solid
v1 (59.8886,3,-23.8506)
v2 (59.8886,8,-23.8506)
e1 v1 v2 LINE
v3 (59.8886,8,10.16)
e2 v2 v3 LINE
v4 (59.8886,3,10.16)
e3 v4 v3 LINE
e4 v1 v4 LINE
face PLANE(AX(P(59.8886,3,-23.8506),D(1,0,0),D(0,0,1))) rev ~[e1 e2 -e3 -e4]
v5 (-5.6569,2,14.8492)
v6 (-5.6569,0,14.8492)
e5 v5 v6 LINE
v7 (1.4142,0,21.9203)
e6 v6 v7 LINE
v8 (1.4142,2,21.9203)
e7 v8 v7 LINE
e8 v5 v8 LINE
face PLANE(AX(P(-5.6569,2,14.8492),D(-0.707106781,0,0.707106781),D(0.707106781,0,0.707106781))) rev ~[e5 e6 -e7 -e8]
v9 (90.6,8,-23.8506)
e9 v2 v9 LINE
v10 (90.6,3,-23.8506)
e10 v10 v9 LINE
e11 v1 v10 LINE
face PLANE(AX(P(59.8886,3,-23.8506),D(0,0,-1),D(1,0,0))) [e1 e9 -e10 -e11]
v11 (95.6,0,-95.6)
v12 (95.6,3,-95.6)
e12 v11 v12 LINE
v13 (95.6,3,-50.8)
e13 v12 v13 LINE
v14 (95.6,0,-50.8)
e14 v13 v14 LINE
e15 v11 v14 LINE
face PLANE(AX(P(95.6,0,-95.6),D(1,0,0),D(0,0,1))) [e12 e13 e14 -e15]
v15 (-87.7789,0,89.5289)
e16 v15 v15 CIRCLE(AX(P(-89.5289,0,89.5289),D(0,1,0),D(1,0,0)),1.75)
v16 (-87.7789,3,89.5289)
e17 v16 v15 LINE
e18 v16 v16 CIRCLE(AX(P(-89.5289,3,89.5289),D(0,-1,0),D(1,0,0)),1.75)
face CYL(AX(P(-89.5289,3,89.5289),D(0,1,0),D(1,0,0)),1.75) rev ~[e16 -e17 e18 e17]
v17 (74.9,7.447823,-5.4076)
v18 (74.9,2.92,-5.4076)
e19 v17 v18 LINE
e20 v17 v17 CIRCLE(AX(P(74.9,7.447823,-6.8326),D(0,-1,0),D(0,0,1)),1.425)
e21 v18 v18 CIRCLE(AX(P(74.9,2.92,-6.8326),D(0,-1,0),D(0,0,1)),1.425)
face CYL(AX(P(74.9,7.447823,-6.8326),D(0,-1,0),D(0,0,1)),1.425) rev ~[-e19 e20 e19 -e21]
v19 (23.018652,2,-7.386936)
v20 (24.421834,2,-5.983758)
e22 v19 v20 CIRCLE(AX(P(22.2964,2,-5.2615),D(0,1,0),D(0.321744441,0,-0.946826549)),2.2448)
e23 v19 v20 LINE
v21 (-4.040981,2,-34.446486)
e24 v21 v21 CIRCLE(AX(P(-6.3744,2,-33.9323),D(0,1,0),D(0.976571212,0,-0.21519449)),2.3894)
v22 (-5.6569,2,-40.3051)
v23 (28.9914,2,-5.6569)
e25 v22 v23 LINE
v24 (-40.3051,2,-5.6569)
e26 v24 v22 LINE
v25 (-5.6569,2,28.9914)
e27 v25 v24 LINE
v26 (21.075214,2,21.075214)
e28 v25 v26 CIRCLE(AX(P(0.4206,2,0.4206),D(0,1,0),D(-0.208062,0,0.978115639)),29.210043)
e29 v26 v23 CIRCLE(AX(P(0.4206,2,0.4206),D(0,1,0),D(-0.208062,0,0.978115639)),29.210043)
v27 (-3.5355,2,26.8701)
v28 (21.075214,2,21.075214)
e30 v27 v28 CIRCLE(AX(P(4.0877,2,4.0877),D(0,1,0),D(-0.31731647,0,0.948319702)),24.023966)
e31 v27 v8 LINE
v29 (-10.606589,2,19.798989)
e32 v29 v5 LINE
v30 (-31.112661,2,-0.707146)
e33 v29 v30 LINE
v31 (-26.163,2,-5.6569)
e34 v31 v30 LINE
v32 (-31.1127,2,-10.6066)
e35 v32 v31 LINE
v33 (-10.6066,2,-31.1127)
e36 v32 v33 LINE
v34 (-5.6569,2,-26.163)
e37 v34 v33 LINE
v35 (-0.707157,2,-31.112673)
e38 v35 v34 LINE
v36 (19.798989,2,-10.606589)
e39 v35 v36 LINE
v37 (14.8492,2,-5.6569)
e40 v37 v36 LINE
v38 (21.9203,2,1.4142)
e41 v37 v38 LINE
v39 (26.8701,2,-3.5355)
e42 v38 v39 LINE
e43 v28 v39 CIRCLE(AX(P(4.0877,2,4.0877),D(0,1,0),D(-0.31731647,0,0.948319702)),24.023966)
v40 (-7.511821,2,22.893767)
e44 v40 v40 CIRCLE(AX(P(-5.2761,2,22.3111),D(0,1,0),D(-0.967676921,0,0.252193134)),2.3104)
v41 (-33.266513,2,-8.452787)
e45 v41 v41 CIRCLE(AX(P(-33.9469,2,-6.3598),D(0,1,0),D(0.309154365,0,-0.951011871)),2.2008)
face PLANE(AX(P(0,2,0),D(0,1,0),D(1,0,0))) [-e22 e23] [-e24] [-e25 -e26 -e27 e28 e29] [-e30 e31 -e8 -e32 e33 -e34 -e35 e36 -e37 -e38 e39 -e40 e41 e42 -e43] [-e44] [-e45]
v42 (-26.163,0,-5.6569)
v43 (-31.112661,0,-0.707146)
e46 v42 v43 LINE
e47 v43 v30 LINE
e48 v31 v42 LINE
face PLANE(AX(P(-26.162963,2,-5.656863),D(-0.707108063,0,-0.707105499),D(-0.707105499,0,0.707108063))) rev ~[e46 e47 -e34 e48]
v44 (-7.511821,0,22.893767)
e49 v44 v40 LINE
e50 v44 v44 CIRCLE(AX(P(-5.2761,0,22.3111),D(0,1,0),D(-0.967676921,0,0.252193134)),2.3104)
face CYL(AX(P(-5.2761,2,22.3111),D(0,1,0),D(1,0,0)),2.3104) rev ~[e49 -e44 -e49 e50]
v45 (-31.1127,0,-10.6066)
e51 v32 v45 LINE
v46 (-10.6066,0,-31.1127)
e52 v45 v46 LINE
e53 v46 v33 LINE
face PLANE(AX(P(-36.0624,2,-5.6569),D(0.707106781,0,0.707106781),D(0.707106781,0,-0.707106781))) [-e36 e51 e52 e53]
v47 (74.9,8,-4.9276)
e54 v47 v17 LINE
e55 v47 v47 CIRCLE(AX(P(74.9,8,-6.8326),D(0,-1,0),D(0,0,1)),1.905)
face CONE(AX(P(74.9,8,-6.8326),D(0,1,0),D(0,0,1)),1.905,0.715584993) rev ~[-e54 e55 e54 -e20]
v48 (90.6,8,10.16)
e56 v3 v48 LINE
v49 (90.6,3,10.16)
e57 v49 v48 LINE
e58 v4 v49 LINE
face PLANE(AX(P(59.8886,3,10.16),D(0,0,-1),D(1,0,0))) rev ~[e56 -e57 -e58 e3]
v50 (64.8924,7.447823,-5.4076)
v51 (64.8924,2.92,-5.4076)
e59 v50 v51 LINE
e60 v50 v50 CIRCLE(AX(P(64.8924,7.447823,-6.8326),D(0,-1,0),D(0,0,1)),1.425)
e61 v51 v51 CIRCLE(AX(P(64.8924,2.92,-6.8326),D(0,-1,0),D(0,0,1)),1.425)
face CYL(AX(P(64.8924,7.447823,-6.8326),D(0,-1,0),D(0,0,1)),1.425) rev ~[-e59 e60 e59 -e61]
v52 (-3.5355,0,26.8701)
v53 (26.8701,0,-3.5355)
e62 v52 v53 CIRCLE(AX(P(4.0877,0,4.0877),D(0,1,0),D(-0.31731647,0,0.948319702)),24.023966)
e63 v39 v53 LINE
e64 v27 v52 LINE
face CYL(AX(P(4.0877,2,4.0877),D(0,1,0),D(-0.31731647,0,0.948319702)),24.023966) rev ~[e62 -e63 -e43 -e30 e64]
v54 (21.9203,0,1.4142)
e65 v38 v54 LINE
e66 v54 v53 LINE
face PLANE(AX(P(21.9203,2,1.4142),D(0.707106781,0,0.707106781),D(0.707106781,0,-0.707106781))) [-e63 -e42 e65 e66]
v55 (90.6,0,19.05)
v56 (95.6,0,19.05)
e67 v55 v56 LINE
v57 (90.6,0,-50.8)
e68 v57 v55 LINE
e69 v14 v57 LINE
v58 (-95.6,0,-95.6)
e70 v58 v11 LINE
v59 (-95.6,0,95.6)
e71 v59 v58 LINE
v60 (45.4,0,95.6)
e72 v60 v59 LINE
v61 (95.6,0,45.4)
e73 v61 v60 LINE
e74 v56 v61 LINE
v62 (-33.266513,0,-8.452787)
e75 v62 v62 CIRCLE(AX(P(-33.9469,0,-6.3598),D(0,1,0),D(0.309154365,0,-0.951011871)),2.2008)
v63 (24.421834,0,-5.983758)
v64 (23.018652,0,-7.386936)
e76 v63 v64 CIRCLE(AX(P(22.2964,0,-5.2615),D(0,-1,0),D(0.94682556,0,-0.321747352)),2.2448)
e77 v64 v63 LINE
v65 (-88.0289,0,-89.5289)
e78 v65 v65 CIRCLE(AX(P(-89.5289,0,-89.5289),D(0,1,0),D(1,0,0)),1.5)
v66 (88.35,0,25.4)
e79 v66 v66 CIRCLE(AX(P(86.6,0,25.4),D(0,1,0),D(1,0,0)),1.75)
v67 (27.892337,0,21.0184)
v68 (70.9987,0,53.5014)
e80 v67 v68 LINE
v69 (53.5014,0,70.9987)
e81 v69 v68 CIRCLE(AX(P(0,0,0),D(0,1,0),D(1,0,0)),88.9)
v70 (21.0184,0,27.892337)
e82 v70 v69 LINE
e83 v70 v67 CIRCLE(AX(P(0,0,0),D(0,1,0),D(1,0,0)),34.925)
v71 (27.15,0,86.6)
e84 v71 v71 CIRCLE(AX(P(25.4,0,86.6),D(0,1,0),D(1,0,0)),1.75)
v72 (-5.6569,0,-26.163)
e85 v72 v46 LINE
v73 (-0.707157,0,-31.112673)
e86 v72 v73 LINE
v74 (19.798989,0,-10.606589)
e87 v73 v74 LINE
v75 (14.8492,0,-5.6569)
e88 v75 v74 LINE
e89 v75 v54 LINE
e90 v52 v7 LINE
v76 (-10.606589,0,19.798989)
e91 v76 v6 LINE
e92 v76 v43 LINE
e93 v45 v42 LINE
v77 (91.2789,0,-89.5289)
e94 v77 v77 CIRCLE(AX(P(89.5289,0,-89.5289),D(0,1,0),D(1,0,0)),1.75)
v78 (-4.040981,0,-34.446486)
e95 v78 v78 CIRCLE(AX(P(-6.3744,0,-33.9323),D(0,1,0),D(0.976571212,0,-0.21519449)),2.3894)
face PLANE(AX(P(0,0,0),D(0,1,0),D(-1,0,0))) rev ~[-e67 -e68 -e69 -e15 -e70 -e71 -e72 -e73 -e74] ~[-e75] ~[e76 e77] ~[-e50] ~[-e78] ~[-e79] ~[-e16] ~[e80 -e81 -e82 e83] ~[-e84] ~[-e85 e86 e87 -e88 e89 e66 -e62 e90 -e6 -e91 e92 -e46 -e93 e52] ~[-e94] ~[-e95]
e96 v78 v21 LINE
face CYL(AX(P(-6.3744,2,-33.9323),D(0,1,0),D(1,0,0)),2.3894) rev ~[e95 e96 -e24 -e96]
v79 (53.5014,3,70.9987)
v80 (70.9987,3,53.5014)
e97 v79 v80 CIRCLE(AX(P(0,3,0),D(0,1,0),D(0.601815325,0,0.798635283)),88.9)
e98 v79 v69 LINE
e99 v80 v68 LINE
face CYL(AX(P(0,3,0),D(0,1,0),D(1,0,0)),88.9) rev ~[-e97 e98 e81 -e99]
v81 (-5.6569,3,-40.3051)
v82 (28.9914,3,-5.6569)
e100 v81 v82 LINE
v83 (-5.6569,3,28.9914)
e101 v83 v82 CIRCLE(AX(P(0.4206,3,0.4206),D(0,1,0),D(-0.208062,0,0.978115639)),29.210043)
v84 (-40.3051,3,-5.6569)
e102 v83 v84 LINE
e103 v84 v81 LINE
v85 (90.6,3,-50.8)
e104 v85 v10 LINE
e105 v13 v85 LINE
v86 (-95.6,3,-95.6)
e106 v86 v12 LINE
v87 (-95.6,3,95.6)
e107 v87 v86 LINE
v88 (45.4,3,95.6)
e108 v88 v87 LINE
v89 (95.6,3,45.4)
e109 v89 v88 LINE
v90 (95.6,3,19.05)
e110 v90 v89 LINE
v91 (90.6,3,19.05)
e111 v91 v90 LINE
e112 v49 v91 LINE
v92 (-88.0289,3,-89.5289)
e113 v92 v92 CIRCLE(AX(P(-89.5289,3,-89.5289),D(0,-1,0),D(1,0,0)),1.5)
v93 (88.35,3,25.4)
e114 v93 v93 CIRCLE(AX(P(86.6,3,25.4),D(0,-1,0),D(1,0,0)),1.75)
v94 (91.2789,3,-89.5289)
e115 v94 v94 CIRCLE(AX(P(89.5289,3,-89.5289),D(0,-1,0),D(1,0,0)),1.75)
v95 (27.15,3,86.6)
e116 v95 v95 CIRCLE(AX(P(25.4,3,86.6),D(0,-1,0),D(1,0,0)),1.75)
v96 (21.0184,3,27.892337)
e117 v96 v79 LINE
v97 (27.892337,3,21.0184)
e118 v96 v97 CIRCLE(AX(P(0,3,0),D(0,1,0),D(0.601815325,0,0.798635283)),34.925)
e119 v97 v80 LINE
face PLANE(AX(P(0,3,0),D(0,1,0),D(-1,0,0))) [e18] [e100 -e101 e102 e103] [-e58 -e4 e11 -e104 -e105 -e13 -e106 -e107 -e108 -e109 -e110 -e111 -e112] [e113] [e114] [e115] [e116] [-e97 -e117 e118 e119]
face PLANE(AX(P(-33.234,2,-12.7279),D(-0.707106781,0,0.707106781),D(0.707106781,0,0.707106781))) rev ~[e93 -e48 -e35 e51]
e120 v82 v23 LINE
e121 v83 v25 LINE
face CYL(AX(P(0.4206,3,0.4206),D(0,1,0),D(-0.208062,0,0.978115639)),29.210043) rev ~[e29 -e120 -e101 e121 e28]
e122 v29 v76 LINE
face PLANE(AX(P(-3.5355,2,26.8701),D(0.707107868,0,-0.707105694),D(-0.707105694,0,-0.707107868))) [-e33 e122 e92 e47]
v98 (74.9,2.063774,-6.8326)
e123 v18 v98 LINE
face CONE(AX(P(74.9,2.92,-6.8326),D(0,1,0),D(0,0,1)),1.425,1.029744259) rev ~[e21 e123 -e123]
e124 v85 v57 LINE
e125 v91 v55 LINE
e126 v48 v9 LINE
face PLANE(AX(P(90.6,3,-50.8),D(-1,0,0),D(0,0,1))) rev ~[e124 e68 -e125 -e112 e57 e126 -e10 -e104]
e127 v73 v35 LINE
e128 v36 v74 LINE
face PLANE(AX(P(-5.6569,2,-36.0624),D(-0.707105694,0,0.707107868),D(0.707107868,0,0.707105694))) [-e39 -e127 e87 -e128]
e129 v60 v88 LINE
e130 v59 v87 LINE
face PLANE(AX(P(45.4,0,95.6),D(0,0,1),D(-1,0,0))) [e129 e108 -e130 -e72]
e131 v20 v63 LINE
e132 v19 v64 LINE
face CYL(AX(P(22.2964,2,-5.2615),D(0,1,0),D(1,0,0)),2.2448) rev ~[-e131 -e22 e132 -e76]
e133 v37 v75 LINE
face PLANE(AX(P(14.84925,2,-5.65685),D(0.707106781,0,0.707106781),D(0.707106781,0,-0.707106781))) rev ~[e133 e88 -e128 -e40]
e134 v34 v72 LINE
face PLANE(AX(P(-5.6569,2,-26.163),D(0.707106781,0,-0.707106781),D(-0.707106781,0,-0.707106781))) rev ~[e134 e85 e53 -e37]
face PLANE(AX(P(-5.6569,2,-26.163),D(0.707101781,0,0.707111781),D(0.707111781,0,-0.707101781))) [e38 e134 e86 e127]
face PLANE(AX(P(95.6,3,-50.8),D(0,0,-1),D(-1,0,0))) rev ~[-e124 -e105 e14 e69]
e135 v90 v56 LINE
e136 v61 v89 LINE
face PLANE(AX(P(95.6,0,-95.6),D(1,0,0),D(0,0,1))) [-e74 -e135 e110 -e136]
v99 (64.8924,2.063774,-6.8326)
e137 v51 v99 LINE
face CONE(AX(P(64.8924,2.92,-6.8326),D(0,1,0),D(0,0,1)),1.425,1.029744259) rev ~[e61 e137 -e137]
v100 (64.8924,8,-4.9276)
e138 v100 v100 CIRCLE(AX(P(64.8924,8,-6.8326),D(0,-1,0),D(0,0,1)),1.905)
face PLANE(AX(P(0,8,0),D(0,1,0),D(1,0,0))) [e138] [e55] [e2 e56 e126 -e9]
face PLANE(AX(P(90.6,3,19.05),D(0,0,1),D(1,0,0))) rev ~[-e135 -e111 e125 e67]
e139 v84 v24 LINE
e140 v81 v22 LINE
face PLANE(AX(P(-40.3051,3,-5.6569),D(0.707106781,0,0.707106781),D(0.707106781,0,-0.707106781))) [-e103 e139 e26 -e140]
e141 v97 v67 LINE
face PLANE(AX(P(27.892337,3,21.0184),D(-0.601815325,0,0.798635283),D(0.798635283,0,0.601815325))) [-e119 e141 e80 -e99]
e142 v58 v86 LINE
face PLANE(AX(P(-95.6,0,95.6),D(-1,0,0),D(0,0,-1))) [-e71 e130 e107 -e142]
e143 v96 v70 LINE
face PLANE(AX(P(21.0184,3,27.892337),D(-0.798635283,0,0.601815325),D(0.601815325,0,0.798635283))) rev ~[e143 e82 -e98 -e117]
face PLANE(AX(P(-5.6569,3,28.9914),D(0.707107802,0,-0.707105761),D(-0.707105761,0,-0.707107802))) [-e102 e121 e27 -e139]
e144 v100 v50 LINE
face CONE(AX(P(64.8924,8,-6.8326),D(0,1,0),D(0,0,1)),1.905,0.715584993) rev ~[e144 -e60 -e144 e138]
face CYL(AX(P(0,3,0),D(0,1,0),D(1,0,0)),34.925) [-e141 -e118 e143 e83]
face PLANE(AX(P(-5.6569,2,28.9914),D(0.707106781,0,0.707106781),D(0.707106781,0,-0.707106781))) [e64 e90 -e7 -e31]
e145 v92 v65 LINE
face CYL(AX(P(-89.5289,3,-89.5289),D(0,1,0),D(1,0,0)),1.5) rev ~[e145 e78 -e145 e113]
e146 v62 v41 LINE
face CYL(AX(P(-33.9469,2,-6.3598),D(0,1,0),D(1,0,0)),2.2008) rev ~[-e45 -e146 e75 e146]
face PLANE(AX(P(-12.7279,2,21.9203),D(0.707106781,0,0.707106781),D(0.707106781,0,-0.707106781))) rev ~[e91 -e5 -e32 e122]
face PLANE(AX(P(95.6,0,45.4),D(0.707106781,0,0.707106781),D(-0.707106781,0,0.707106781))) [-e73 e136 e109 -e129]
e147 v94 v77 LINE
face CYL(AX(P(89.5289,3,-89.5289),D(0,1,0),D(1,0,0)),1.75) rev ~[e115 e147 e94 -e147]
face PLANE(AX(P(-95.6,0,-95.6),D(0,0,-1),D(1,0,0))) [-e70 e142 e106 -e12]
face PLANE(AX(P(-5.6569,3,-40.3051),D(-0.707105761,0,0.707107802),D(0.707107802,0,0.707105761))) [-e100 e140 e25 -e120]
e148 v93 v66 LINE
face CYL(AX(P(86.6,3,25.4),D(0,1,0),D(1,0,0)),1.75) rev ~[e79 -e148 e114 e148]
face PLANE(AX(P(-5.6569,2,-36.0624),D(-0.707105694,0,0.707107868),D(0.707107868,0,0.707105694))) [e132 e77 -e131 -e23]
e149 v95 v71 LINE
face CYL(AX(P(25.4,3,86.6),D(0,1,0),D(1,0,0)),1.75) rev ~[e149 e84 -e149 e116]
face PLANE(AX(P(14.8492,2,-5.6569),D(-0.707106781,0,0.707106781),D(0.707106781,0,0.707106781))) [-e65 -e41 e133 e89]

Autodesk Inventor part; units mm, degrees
ref_plane "YZ Plane" through (0, 0, 0) normal (1, 0, 0) x (0, 1, 0)
ref_plane "XZ Plane" through (0, 0, 0) normal (0, 1, 0) x (-1, 0, 0)
ref_plane "XY Plane" through (0, 0, 0) normal (0, 0, 1) x (1, 0, 0)
sketch "Sketch1" plane through (0, 0, 0) normal (0, 1, 0) x (-1, 0, 0)
  line L0 (101.6, -101.6) -> (-101.6, -101.6)
  line L1 (-101.6, -101.6) -> (-101.6, 101.6)
  line L2 (-101.6, 101.6) -> (101.6, 101.6)
  line L3 (101.6, 101.6) -> (101.6, -101.6)
  line L4 (96.6, -96.6) -> (-96.6, -96.6)
  line L5 (-96.6, -96.6) -> (-96.6, 96.6)
  line L6 (-96.6, 96.6) -> (96.6, 96.6)
  line L7 (96.6, 96.6) -> (96.6, -96.6)
  line L8 (101.6, 101.6) -> (-40.4, 101.6)
  circle A0 centre (0, 0) radius 88.9
  line L9 (-40.4, 101.6) -> (-101.6, 40.4)
  line L10 (-45.4, 101.6) -> (-101.6, 45.4)
  line L11 (96.6, 96.6) -> (96.6, 101.6)
  line L12 (-45.4, 101.6) -> (-35.4, 101.6)
  line L13 (-35.4, 101.6) -> (-35.4, 96.6)
  line L14 (-35.4, 96.6) -> (-45.4, 96.6)
  line L15 (-45.4, 96.6) -> (-45.4, 101.6)
  line L16 (-101.6, 39.4) -> (-39.4, 101.6)
  line L17 (95.6, -95.6) -> (-95.6, -95.6)
  line L18 (-95.6, -95.6) -> (-95.6, 95.6)
  line L19 (-95.6, 95.6) -> (95.6, 95.6)
  line L20 (95.6, 95.6) -> (95.6, -95.6)
  point P0 (96.6, 51.2168)
  point P1 (101.6, 40.4)
  point P2 (101.6, -40.4)
  point P3 (96.6, -51.2168)
  point P4 (-96.6, 45.4)
  point P5 (-45.4, 96.6)
  point P6 (-45.4, 95.6)
  point P7 (-95.6, 45.4)
  dimension "d0" = 203.2
  dimension "d1" = 203.2
  dimension "d2" = 101.6
  dimension "d3" = 101.6
  dimension "d4" = 5
  dimension "d5" = 5
  dimension "d6" = 5
  dimension "d7" = 5
  dimension "d8" = 142
  dimension "d9" = 61.2
  dimension "d10" = 177.8
  dimension "d11" = 5
  dimension "d12" = 5
  dimension "d13" = 10
  dimension "d14" = 1
  dimension "d15" = 1
  dimension "d16" = 1
  dimension "d17" = 1
  dimension "d18" = 1
extrude "Extrusion1" add sketch "Sketch1" along normal blind 3 contours L16 L19 L20 L17 L18 | A0
sketch "Sketch2" plane through (0, 3, 0) normal (0, 1, 0) x (1, 0, 0)
  circle A0 centre (0, 0) radius 34.925
  circle A1 centre (0, 0) radius 88.9
  line L0 (0, 0) -> (53.5014, -70.9987)
  line L1 (0, 0) -> (70.9987, -53.5014)
  line L2 (45.4, -95.6) -> (95.6, -45.4) projected
  line L3 (70.5, -70.5) -> (0, 0)
  point P0 (21.0184, -27.8923)
  point P1 (27.8923, -21.0184)
  dimension "d21" = 69.85
  dimension "d22" = 177.8
  dimension "d23" = 8
  dimension "d24" = 8
extrude "Extrusion2" cut sketch "Sketch2" against normal blind 5 contours A0 L3 A1 L0 | L1 A1 L3 A0
sketch "Sketch3" plane through (0, 3, 0) normal (0, 1, 0) x (1, 0, 0)
  circle A0 centre (0, 0) radius 2.5
  line L0 (11.3314, 2.139) -> (-2.139, -11.3314)
  line L1 (0, 0) -> (-5.6569, 5.6569)
  line L2 (-5.6569, -14.8492) -> (-26.163, 5.6569)
  line L3 (-5.6569, 26.163) -> (14.8492, 5.6569)
  circle A1 centre (-5.6569, 5.6569) radius 14
  line L4 (-26.163, 5.6569) -> (-5.6569, 26.163)
  line L5 (14.8492, 5.6569) -> (-5.6569, -14.8492)
  line L6 (-40.3051, 5.6569) -> (-5.6569, 40.3051)
  line L7 (-5.6569, 40.3051) -> (28.9914, 5.6569)
  line L8 (28.9914, 5.6569) -> (-5.6569, -28.9914)
  line L9 (-5.6569, -28.9914) -> (-40.3051, 5.6569)
  line L10 (-22.6451, 9.1747) -> (-9.1747, 22.6451)
  line L11 (-9.1747, 22.6451) -> (-12.7668, 26.2372)
  line L12 (-12.7668, 26.2372) -> (-26.2372, 12.7668)
  line L13 (-26.2372, 12.7668) -> (-22.6451, 9.1747)
  line L14 (-36.0624, 5.6569) -> (-5.6569, 36.0624)
  line L15 (-5.6569, 36.0624) -> (26.8701, 3.5355)
  line L16 (26.8701, 3.5355) -> (-3.5355, -26.8701)
  line L17 (-3.5355, -26.8701) -> (-36.0624, 5.6569)
  arc A2 (-5.6569, -28.9914) -> (28.9914, 5.6569) centre (0.4206, -0.4206) ccw
  dimension "d27" = 8
  dimension "d28" = 28
  dimension "d29" = 29
  dimension "d30" = 29
  dimension "d31" = 14.5
  dimension "d32" = 10
  dimension "d33" = 10
  dimension "d34" = 10
  dimension "d35" = 10
  dimension "d36" = 5.08
  dimension "d37" = 9.525
  dimension "d38" = 9.525
  dimension "d39" = 3
  dimension "d40" = 3
  dimension "d41" = 0
  dimension "d42" = 3
  dimension "d51" = 29.21
extrude "Extrusion3" cut sketch "Sketch3" against normal blind 1 contours A0 | L0 L5 L2 L4 L3 | L4 L13 L12 L11 | A1 | L6 L7 L8 L15 L14 L17 L9 | L8 A2 | L17 L14 L15 L8
sketch "Sketch4" plane through (0, 2, 0) normal (0, 1, 0) x (1, 0, 0)
  line L0 (-36.0624, 5.6569) -> (-5.6569, 36.0624)
  line L1 (-5.6569, 36.0624) -> (26.8701, 3.5355)
  line L2 (26.8701, 3.5355) -> (-3.5355, -26.8701)
  line L3 (-3.5355, -26.8701) -> (-36.0624, 5.6569)
  line L4 (-5.6569, 40.3051) -> (28.9914, 5.6569) projected
  line L5 (-40.3051, 5.6569) -> (-5.6569, 40.3051) projected
  line L6 (-5.6569, -28.9914) -> (-40.3051, 5.6569) projected
  line L7 (28.9914, 5.6569) -> (-5.6569, -28.9914) projected
  arc A0 (-3.5355, -26.8701) -> (26.8701, 3.5355) centre (4.0877, -4.0877) ccw
  point P0 (0, 0)
  dimension "d45" = 3
  dimension "d46" = 3
  dimension "d47" = 3
  dimension "d48" = 0
extrude "Extrusion4" cut sketch "Sketch4" against normal blind 5 contours L0 L1 L2 L3 | L2 A0
sketch "Sketch6" plane through (0, 3, 0) normal (0, 1, 0) x (1, 0, 0)
  line L0 (95.6, 95.6) -> (-95.6, 95.6) projected
  line L1 (95.6, 95.6) -> (90.6, 95.6)
  line L2 (90.6, 95.6) -> (90.6, -46.4)
  line L3 (90.6, -46.4) -> (95.6, -46.4)
  line L4 (95.6, -46.4) -> (95.6, 95.6)
  line L5 (95.6, -45.4) -> (95.6, 95.6) projected
  line L6 (90.6, -19.05) -> (95.6, -19.05)
  line L7 (95.6, -19.05) -> (95.6, 50.8)
  line L8 (95.6, 50.8) -> (90.6, 50.8)
  line L9 (90.6, 50.8) -> (90.6, -19.05)
  line L10 (0, 0) -> (95.6, 0)
  point P0 (95.6, -19.05)
  dimension "d58" = 5
  dimension "d59" = 142
  dimension "d62" = 50.8
  dimension "d63" = 19.05
extrude "Extrusion6" cut sketch "Sketch6" against normal blind 25.4 contours L4 L10 L2 L8 | L4 L6 L2 L10
sketch "Sketch7" plane through (0, 3, 0) normal (0, 1, 0) x (1, 0, 0)
  line L0 (-95.6, 95.6) -> (-95.6, -95.6) projected
  line L1 (-95.6, -95.6) -> (45.4, -95.6) projected
  line L2 (95.6, 50.8) -> (90.6, 50.8) projected
  line L3 (90.6, 50.8) -> (65.2, 50.8)
  line L4 (90.6, -19.05) -> (90.6, 50.8)
  line L5 (90.6, -19.05) -> (90.6, 50.8) projected
  line L6 (90.6, 50.8) -> (95.6, 50.8) projected
  line L7 (90.6, 50.8) -> (59.8886, 50.8)
  line L8 (59.8886, 50.8) -> (59.8886, -10.16)
  line L9 (59.8886, -10.16) -> (90.6, -10.16)
  line L10 (90.6, -10.16) -> (90.6, 50.8)
  line L11 (59.8886, 23.8506) -> (90.6, 23.8506)
  point P0 (0, 0)
  point P1 (62.2, 50.8)
  dimension "d72" = 60.96
  dimension "d90" = 34.0106
  dimension "d154" = 30.7114
extrude "Extrusion7" add sketch "Sketch7" along normal blind 5 contours L4 L9 L8 L11
sketch "Sketch8" plane through (0, 8, 0) normal (0, 1, 0) x (1, 0, 0)
  line L0 (59.8886, -10.16) -> (90.6, -10.16) projected
  line L1 (59.8886, -10.16) -> (90.6, -10.16)
  line L2 (90.6, -10.16) -> (90.6, 6.8326)
  line L3 (90.6, 50.8) -> (90.6, -19.05) projected
  line L4 (90.6, 6.8326) -> (65.2, 6.8326)
  circle A0 centre (74.9, 6.8326) radius 1.5
  circle A1 centre (64.8924, 6.8326) radius 1.5
  line L5 (59.8886, 23.8506) -> (59.8886, -10.16) projected
  point P0 (0, 0)
  dimension "d78" = 16.9926
  dimension "d79" = 3
  dimension "d80" = 3
  dimension "d139" = 5.0038
  dimension "d140" = 10.0076
  dimension "d153" = 15.7
hole "Hole1" at (74.9, 8, -6.8326) at (64.8924, 8, -6.8326) direction (0, -1, 0) diameter 2.85 depth 5.08 tip angle 118 countersink diameter 3.81 countersink angle 82 thread size "M3.5x0.6" class "6H" standard "ANSI Metric M Profile"
sketch "Sketch9" plane through (0, 2, 0) normal (0, 1, 0) x (1, 0, 0)
  point P0 (0, 0)
sketch "Sketch10" plane through (0, 2, 0) normal (0, 1, 0) x (1, 0, 0)
  circle A0 centre (6.7129, 18.0166) radius 2
  circle A1 centre (-18.0312, -6.7275) radius 2
  circle A2 centre (-18.0312, -6.7275) radius 2
  circle A3 centre (-5.6569, 5.6469) radius 14
  circle A4 centre (0, -0.01) radius 2.5
  circle A5 centre (22.2964, 5.2615) radius 2.2448
  circle A6 centre (-5.2761, -22.3111) radius 2.3104
  circle A7 centre (-33.9469, 6.3598) radius 2.2008
  circle A8 centre (-6.3744, 33.9323) radius 2.3894
  line L0 (-5.6569, 40.3051) -> (28.9914, 5.6569) projected
  line L1 (-5.6569, 40.3051) -> (1.4142, 33.234)
  line L2 (-5.6569, 26.163) -> (1.4142, 33.234)
  line L3 (-5.6569, 26.163) -> (-12.7279, 33.234)
  line L4 (-40.3051, 5.6569) -> (-5.6569, 40.3051) projected
  line L5 (-5.6569, 40.3051) -> (-40.3051, 5.6569)
  line L6 (-5.6569, 26.163) -> (-33.234, -1.4142)
  line L7 (-5.6569, -28.9914) -> (-40.3051, 5.6569) projected
  line L8 (-33.234, 12.7279) -> (-26.163, 5.6569)
  arc A9 (-5.6569, -28.9914) -> (21.0752, -21.0752) centre (0.4206, -0.4206) ccw projected
  line L9 (-5.6569, -28.9914) -> (28.9914, 5.6569)
  line L10 (-5.6569, 36.0624) -> (26.8701, 3.5355) projected
  line L11 (-12.7279, -21.9203) -> (21.9203, 12.7279)
  line L12 (-5.6569, -14.8492) -> (1.4142, -21.9203)
  line L13 (14.8492, 5.6569) -> (21.9203, -1.4142)
  point P0 (0, 0)
  point P1 (0.0071, -0.017)
  point P2 (24.4219, 5.9837)
  point P3 (23.0187, 7.3869)
  point P4 (19.799, 10.6066)
  dimension "d91" = 34.9934
  dimension "d92" = 28
  dimension "d93" = 8
  dimension "d94" = 10
  dimension "d95" = 10
  dimension "d96" = 10
  dimension "d97" = 10
  dimension "d98" = 10
extrude "Extrusion8" add sketch "Sketch10" against normal up to surface (2 mm away) contours A5 L10 L9 L13 L11 | L2 L3 L4 L0 | L9 L7 L11 L12 | L6 L7 L4 L8
sketch "Sketch11" plane through (0, 3, 0) normal (0, 1, 0) x (1, 0, 0)
  circle A0 centre (6.7129, 18.0166) radius 2
  circle A1 centre (-18.0312, -6.7275) radius 2
  circle A2 centre (-18.0312, -6.7275) radius 2
  circle A3 centre (-5.6569, 5.6469) radius 14
  circle A4 centre (0, -0.01) radius 2.5
  circle A5 centre (22.2964, 5.2615) radius 2.2448
  circle A6 centre (-5.2761, -22.3111) radius 2.3104
  circle A7 centre (-33.9469, 6.3598) radius 2.2008
  circle A8 centre (-6.3744, 33.9323) radius 2.3894
  line L0 (-5.6569, 40.3051) -> (28.9914, 5.6569)
  line L1 (-5.6569, 40.3051) -> (1.4142, 33.234)
  line L2 (-5.6569, 26.163) -> (1.4142, 33.234)
  line L3 (-5.6569, 26.163) -> (-12.7279, 33.234)
  line L4 (-40.3051, 5.6569) -> (-5.6569, 40.3051)
  line L5 (-5.6569, 40.3051) -> (-40.3051, 5.6569)
  line L6 (-5.6569, 26.163) -> (-33.234, -1.4142)
  line L7 (-5.6569, -28.9914) -> (-40.3051, 5.6569)
  line L8 (-33.234, 12.7279) -> (-26.163, 5.6569)
  arc A9 (-5.6569, -28.9914) -> (21.0752, -21.0752) centre (0.4206, -0.4206) ccw
  line L9 (-5.6569, -28.9914) -> (28.9914, 5.6569)
  line L10 (-5.6569, 36.0624) -> (26.8701, 3.5355)
  line L11 (-12.7279, -21.9203) -> (21.9203, 12.7279)
  line L12 (-5.6569, -14.8492) -> (1.4142, -21.9203)
  line L13 (14.8492, 5.6569) -> (21.9203, -1.4142)
  point P0 (0, 0)
  point P1 (0, 0)
  point P2 (0.0071, -0.017)
  point P3 (24.4219, 5.9837)
  point P4 (23.0187, 7.3869)
  point P5 (19.799, 10.6066)
  point P6 (24.4219, 5.9837)
  point P7 (23.0187, 7.3869)
  dimension "d101" = 34.9934
  dimension "d102" = 28
  dimension "d103" = 8
  dimension "d104" = 10
  dimension "d105" = 10
  dimension "d106" = 10
  dimension "d107" = 10
  dimension "d108" = 10
extrude "Extrusion9" cut sketch "Sketch11" against normal blind 10 contours A5 L10 | A6 | A7 | A8 picked at (21.4653, 4.9881)
sketch "Sketch12" plane through (0, 3, 0) normal (0, 1, 0) x (1, 0, 0)
  line L0 (95.6, 50.8) -> (95.6, 95.6) projected
  line L1 (-95.6, -95.6) -> (45.4, -95.6) projected
  line L2 (95.6, 95.6) -> (-95.6, -95.6)
  line L3 (95.6, 95.6) -> (-95.6, 95.6) projected
  line L4 (0, 95.6) -> (0, -95.6)
  line L5 (-95.6, -95.6) -> (45.4, -95.6) projected
  point P0 (0, 0)
ref_plane "Work Plane2" through (0, 3, -95.6) normal (-1, 0, 0) x (0, 0, 1)
sketch "Sketch15" plane through (0, 3, 0) normal (0, 1, 0) x (1, 0, 0)
  line L0 (-96.6, 96.6) -> (-96.6, -96.6)
  line L1 (96.6, 96.6) -> (-96.6, 96.6)
  line L2 (-96.6, 96.6) -> (96.6, 96.6)
  line L3 (96.6, -45.4) -> (45.4, -96.6)
  line L4 (96.6, 96.6) -> (96.6, -45.4)
  line L5 (96.6, -45.4) -> (45.4, -96.6)
  line L6 (45.4, -96.6) -> (-96.6, -96.6)
  line L7 (-96.6, -96.6) -> (-96.6, 96.6)
  line L8 (-96.6, 96.6) -> (-89.5289, 89.5289)
  circle A0 centre (-89.5289, 89.5289) radius 5
  circle A1 centre (-89.5289, 89.5289) radius 1.5
  line L9 (-89.5289, 84.5289) -> (-96.6, 84.5289)
  line L10 (-89.5289, 89.5289) -> (-89.5289, 84.5289)
  line L11 (-89.5289, 89.5289) -> (-84.5289, 89.5289)
  line L12 (-84.5289, 96.6) -> (-84.5289, 89.5289)
  line L13 (-96.6, -96.6) -> (-89.5289, -89.5289)
  line L14 (-96.6, -96.6) -> (-86.6, -96.6) construction
  circle A2 centre (-89.5289, -89.5289) radius 5
  circle A3 centre (-89.5289, -89.5289) radius 1.75
  line L15 (-89.5289, -89.5289) -> (-84.5289, -89.5289)
  line L16 (-84.5289, -96.6) -> (-84.5289, -89.5289)
  line L17 (-89.5289, -89.5289) -> (-89.5289, -84.5289)
  line L18 (-96.6, -84.5289) -> (-89.5289, -84.5289)
  line L19 (96.6, 96.6) -> (89.5289, 89.5289)
  circle A4 centre (89.5289, 89.5289) radius 5
  circle A5 centre (89.5289, 89.5289) radius 1.75
  line L20 (89.5289, 89.5289) -> (84.5289, 89.5289)
  line L21 (84.5289, 96.6) -> (84.5289, 89.5289)
  line L22 (89.5289, 89.5289) -> (89.5289, 84.5289)
  line L23 (96.6, 84.5289) -> (89.5289, 84.5289)
  line L24 (96.6, -43.114) -> (96.6, 96.6)
  line L25 (-96.6, -96.6) -> (43.1178, -96.6)
  line L26 (28.9914, 5.6569) -> (-5.6569, -28.9914)
  line L27 (25.4, -25.4) -> (101.6, -25.4)
  line L28 (101.6, -88.9) -> (101.6, 101.6)
  line L29 (25.4, -25.4) -> (25.4, -101.6)
  line L30 (43.1178, -101.6) -> (-101.6, -101.6)
  line L31 (96.6, -25.4) -> (86.6, -25.4)
  circle A6 centre (86.6, -25.4) radius 5
  circle A7 centre (86.6, -25.4) radius 1.75
  line L32 (25.4, -96.6) -> (25.4, -86.6)
  circle A8 centre (25.4, -86.6) radius 5
  circle A9 centre (25.4, -86.6) radius 1.75
  point P0 (0, 0)
  point P1 (0, 0)
  dimension "d117" = 10
  dimension "d118" = 3
  dimension "d119" = 10
  dimension "d120" = 45
  dimension "d121" = 10
  dimension "d122" = 3.5
  dimension "d123" = 10
  dimension "d124" = 10
  dimension "d125" = 3.5
  dimension "d126" = 76.2
  dimension "d127" = 76.2
  dimension "d128" = 10
  dimension "d129" = 10
  dimension "d130" = 3.5
  dimension "d131" = 10
  dimension "d132" = 10
  dimension "d133" = 3.5
extrude "Extrusion12" cut sketch "Sketch15" against normal blind 25.4 contours A1 L11 L8 | L8 L10 A1 | L10 L11 A1 | L17 L13 A3 | A3 L15 L17 | L20 L22 A5 | A5 L19 L20 | L13 L15 A3 | A5 L22 L19 | A9 L29 | L29 A9 | A7 L27 | L27 A7
ref_plane "Work Plane3" through (0, 3, -95.6) normal (-0.7071068, -0.7071068, 0) x (0, 0, 1)
equation "\"d1\" = d0"
equation "\"d2\" = 0.5 * d0"
equation "\"d3\" = 0.5 * d0"
properties part number "Drop_Plate"
